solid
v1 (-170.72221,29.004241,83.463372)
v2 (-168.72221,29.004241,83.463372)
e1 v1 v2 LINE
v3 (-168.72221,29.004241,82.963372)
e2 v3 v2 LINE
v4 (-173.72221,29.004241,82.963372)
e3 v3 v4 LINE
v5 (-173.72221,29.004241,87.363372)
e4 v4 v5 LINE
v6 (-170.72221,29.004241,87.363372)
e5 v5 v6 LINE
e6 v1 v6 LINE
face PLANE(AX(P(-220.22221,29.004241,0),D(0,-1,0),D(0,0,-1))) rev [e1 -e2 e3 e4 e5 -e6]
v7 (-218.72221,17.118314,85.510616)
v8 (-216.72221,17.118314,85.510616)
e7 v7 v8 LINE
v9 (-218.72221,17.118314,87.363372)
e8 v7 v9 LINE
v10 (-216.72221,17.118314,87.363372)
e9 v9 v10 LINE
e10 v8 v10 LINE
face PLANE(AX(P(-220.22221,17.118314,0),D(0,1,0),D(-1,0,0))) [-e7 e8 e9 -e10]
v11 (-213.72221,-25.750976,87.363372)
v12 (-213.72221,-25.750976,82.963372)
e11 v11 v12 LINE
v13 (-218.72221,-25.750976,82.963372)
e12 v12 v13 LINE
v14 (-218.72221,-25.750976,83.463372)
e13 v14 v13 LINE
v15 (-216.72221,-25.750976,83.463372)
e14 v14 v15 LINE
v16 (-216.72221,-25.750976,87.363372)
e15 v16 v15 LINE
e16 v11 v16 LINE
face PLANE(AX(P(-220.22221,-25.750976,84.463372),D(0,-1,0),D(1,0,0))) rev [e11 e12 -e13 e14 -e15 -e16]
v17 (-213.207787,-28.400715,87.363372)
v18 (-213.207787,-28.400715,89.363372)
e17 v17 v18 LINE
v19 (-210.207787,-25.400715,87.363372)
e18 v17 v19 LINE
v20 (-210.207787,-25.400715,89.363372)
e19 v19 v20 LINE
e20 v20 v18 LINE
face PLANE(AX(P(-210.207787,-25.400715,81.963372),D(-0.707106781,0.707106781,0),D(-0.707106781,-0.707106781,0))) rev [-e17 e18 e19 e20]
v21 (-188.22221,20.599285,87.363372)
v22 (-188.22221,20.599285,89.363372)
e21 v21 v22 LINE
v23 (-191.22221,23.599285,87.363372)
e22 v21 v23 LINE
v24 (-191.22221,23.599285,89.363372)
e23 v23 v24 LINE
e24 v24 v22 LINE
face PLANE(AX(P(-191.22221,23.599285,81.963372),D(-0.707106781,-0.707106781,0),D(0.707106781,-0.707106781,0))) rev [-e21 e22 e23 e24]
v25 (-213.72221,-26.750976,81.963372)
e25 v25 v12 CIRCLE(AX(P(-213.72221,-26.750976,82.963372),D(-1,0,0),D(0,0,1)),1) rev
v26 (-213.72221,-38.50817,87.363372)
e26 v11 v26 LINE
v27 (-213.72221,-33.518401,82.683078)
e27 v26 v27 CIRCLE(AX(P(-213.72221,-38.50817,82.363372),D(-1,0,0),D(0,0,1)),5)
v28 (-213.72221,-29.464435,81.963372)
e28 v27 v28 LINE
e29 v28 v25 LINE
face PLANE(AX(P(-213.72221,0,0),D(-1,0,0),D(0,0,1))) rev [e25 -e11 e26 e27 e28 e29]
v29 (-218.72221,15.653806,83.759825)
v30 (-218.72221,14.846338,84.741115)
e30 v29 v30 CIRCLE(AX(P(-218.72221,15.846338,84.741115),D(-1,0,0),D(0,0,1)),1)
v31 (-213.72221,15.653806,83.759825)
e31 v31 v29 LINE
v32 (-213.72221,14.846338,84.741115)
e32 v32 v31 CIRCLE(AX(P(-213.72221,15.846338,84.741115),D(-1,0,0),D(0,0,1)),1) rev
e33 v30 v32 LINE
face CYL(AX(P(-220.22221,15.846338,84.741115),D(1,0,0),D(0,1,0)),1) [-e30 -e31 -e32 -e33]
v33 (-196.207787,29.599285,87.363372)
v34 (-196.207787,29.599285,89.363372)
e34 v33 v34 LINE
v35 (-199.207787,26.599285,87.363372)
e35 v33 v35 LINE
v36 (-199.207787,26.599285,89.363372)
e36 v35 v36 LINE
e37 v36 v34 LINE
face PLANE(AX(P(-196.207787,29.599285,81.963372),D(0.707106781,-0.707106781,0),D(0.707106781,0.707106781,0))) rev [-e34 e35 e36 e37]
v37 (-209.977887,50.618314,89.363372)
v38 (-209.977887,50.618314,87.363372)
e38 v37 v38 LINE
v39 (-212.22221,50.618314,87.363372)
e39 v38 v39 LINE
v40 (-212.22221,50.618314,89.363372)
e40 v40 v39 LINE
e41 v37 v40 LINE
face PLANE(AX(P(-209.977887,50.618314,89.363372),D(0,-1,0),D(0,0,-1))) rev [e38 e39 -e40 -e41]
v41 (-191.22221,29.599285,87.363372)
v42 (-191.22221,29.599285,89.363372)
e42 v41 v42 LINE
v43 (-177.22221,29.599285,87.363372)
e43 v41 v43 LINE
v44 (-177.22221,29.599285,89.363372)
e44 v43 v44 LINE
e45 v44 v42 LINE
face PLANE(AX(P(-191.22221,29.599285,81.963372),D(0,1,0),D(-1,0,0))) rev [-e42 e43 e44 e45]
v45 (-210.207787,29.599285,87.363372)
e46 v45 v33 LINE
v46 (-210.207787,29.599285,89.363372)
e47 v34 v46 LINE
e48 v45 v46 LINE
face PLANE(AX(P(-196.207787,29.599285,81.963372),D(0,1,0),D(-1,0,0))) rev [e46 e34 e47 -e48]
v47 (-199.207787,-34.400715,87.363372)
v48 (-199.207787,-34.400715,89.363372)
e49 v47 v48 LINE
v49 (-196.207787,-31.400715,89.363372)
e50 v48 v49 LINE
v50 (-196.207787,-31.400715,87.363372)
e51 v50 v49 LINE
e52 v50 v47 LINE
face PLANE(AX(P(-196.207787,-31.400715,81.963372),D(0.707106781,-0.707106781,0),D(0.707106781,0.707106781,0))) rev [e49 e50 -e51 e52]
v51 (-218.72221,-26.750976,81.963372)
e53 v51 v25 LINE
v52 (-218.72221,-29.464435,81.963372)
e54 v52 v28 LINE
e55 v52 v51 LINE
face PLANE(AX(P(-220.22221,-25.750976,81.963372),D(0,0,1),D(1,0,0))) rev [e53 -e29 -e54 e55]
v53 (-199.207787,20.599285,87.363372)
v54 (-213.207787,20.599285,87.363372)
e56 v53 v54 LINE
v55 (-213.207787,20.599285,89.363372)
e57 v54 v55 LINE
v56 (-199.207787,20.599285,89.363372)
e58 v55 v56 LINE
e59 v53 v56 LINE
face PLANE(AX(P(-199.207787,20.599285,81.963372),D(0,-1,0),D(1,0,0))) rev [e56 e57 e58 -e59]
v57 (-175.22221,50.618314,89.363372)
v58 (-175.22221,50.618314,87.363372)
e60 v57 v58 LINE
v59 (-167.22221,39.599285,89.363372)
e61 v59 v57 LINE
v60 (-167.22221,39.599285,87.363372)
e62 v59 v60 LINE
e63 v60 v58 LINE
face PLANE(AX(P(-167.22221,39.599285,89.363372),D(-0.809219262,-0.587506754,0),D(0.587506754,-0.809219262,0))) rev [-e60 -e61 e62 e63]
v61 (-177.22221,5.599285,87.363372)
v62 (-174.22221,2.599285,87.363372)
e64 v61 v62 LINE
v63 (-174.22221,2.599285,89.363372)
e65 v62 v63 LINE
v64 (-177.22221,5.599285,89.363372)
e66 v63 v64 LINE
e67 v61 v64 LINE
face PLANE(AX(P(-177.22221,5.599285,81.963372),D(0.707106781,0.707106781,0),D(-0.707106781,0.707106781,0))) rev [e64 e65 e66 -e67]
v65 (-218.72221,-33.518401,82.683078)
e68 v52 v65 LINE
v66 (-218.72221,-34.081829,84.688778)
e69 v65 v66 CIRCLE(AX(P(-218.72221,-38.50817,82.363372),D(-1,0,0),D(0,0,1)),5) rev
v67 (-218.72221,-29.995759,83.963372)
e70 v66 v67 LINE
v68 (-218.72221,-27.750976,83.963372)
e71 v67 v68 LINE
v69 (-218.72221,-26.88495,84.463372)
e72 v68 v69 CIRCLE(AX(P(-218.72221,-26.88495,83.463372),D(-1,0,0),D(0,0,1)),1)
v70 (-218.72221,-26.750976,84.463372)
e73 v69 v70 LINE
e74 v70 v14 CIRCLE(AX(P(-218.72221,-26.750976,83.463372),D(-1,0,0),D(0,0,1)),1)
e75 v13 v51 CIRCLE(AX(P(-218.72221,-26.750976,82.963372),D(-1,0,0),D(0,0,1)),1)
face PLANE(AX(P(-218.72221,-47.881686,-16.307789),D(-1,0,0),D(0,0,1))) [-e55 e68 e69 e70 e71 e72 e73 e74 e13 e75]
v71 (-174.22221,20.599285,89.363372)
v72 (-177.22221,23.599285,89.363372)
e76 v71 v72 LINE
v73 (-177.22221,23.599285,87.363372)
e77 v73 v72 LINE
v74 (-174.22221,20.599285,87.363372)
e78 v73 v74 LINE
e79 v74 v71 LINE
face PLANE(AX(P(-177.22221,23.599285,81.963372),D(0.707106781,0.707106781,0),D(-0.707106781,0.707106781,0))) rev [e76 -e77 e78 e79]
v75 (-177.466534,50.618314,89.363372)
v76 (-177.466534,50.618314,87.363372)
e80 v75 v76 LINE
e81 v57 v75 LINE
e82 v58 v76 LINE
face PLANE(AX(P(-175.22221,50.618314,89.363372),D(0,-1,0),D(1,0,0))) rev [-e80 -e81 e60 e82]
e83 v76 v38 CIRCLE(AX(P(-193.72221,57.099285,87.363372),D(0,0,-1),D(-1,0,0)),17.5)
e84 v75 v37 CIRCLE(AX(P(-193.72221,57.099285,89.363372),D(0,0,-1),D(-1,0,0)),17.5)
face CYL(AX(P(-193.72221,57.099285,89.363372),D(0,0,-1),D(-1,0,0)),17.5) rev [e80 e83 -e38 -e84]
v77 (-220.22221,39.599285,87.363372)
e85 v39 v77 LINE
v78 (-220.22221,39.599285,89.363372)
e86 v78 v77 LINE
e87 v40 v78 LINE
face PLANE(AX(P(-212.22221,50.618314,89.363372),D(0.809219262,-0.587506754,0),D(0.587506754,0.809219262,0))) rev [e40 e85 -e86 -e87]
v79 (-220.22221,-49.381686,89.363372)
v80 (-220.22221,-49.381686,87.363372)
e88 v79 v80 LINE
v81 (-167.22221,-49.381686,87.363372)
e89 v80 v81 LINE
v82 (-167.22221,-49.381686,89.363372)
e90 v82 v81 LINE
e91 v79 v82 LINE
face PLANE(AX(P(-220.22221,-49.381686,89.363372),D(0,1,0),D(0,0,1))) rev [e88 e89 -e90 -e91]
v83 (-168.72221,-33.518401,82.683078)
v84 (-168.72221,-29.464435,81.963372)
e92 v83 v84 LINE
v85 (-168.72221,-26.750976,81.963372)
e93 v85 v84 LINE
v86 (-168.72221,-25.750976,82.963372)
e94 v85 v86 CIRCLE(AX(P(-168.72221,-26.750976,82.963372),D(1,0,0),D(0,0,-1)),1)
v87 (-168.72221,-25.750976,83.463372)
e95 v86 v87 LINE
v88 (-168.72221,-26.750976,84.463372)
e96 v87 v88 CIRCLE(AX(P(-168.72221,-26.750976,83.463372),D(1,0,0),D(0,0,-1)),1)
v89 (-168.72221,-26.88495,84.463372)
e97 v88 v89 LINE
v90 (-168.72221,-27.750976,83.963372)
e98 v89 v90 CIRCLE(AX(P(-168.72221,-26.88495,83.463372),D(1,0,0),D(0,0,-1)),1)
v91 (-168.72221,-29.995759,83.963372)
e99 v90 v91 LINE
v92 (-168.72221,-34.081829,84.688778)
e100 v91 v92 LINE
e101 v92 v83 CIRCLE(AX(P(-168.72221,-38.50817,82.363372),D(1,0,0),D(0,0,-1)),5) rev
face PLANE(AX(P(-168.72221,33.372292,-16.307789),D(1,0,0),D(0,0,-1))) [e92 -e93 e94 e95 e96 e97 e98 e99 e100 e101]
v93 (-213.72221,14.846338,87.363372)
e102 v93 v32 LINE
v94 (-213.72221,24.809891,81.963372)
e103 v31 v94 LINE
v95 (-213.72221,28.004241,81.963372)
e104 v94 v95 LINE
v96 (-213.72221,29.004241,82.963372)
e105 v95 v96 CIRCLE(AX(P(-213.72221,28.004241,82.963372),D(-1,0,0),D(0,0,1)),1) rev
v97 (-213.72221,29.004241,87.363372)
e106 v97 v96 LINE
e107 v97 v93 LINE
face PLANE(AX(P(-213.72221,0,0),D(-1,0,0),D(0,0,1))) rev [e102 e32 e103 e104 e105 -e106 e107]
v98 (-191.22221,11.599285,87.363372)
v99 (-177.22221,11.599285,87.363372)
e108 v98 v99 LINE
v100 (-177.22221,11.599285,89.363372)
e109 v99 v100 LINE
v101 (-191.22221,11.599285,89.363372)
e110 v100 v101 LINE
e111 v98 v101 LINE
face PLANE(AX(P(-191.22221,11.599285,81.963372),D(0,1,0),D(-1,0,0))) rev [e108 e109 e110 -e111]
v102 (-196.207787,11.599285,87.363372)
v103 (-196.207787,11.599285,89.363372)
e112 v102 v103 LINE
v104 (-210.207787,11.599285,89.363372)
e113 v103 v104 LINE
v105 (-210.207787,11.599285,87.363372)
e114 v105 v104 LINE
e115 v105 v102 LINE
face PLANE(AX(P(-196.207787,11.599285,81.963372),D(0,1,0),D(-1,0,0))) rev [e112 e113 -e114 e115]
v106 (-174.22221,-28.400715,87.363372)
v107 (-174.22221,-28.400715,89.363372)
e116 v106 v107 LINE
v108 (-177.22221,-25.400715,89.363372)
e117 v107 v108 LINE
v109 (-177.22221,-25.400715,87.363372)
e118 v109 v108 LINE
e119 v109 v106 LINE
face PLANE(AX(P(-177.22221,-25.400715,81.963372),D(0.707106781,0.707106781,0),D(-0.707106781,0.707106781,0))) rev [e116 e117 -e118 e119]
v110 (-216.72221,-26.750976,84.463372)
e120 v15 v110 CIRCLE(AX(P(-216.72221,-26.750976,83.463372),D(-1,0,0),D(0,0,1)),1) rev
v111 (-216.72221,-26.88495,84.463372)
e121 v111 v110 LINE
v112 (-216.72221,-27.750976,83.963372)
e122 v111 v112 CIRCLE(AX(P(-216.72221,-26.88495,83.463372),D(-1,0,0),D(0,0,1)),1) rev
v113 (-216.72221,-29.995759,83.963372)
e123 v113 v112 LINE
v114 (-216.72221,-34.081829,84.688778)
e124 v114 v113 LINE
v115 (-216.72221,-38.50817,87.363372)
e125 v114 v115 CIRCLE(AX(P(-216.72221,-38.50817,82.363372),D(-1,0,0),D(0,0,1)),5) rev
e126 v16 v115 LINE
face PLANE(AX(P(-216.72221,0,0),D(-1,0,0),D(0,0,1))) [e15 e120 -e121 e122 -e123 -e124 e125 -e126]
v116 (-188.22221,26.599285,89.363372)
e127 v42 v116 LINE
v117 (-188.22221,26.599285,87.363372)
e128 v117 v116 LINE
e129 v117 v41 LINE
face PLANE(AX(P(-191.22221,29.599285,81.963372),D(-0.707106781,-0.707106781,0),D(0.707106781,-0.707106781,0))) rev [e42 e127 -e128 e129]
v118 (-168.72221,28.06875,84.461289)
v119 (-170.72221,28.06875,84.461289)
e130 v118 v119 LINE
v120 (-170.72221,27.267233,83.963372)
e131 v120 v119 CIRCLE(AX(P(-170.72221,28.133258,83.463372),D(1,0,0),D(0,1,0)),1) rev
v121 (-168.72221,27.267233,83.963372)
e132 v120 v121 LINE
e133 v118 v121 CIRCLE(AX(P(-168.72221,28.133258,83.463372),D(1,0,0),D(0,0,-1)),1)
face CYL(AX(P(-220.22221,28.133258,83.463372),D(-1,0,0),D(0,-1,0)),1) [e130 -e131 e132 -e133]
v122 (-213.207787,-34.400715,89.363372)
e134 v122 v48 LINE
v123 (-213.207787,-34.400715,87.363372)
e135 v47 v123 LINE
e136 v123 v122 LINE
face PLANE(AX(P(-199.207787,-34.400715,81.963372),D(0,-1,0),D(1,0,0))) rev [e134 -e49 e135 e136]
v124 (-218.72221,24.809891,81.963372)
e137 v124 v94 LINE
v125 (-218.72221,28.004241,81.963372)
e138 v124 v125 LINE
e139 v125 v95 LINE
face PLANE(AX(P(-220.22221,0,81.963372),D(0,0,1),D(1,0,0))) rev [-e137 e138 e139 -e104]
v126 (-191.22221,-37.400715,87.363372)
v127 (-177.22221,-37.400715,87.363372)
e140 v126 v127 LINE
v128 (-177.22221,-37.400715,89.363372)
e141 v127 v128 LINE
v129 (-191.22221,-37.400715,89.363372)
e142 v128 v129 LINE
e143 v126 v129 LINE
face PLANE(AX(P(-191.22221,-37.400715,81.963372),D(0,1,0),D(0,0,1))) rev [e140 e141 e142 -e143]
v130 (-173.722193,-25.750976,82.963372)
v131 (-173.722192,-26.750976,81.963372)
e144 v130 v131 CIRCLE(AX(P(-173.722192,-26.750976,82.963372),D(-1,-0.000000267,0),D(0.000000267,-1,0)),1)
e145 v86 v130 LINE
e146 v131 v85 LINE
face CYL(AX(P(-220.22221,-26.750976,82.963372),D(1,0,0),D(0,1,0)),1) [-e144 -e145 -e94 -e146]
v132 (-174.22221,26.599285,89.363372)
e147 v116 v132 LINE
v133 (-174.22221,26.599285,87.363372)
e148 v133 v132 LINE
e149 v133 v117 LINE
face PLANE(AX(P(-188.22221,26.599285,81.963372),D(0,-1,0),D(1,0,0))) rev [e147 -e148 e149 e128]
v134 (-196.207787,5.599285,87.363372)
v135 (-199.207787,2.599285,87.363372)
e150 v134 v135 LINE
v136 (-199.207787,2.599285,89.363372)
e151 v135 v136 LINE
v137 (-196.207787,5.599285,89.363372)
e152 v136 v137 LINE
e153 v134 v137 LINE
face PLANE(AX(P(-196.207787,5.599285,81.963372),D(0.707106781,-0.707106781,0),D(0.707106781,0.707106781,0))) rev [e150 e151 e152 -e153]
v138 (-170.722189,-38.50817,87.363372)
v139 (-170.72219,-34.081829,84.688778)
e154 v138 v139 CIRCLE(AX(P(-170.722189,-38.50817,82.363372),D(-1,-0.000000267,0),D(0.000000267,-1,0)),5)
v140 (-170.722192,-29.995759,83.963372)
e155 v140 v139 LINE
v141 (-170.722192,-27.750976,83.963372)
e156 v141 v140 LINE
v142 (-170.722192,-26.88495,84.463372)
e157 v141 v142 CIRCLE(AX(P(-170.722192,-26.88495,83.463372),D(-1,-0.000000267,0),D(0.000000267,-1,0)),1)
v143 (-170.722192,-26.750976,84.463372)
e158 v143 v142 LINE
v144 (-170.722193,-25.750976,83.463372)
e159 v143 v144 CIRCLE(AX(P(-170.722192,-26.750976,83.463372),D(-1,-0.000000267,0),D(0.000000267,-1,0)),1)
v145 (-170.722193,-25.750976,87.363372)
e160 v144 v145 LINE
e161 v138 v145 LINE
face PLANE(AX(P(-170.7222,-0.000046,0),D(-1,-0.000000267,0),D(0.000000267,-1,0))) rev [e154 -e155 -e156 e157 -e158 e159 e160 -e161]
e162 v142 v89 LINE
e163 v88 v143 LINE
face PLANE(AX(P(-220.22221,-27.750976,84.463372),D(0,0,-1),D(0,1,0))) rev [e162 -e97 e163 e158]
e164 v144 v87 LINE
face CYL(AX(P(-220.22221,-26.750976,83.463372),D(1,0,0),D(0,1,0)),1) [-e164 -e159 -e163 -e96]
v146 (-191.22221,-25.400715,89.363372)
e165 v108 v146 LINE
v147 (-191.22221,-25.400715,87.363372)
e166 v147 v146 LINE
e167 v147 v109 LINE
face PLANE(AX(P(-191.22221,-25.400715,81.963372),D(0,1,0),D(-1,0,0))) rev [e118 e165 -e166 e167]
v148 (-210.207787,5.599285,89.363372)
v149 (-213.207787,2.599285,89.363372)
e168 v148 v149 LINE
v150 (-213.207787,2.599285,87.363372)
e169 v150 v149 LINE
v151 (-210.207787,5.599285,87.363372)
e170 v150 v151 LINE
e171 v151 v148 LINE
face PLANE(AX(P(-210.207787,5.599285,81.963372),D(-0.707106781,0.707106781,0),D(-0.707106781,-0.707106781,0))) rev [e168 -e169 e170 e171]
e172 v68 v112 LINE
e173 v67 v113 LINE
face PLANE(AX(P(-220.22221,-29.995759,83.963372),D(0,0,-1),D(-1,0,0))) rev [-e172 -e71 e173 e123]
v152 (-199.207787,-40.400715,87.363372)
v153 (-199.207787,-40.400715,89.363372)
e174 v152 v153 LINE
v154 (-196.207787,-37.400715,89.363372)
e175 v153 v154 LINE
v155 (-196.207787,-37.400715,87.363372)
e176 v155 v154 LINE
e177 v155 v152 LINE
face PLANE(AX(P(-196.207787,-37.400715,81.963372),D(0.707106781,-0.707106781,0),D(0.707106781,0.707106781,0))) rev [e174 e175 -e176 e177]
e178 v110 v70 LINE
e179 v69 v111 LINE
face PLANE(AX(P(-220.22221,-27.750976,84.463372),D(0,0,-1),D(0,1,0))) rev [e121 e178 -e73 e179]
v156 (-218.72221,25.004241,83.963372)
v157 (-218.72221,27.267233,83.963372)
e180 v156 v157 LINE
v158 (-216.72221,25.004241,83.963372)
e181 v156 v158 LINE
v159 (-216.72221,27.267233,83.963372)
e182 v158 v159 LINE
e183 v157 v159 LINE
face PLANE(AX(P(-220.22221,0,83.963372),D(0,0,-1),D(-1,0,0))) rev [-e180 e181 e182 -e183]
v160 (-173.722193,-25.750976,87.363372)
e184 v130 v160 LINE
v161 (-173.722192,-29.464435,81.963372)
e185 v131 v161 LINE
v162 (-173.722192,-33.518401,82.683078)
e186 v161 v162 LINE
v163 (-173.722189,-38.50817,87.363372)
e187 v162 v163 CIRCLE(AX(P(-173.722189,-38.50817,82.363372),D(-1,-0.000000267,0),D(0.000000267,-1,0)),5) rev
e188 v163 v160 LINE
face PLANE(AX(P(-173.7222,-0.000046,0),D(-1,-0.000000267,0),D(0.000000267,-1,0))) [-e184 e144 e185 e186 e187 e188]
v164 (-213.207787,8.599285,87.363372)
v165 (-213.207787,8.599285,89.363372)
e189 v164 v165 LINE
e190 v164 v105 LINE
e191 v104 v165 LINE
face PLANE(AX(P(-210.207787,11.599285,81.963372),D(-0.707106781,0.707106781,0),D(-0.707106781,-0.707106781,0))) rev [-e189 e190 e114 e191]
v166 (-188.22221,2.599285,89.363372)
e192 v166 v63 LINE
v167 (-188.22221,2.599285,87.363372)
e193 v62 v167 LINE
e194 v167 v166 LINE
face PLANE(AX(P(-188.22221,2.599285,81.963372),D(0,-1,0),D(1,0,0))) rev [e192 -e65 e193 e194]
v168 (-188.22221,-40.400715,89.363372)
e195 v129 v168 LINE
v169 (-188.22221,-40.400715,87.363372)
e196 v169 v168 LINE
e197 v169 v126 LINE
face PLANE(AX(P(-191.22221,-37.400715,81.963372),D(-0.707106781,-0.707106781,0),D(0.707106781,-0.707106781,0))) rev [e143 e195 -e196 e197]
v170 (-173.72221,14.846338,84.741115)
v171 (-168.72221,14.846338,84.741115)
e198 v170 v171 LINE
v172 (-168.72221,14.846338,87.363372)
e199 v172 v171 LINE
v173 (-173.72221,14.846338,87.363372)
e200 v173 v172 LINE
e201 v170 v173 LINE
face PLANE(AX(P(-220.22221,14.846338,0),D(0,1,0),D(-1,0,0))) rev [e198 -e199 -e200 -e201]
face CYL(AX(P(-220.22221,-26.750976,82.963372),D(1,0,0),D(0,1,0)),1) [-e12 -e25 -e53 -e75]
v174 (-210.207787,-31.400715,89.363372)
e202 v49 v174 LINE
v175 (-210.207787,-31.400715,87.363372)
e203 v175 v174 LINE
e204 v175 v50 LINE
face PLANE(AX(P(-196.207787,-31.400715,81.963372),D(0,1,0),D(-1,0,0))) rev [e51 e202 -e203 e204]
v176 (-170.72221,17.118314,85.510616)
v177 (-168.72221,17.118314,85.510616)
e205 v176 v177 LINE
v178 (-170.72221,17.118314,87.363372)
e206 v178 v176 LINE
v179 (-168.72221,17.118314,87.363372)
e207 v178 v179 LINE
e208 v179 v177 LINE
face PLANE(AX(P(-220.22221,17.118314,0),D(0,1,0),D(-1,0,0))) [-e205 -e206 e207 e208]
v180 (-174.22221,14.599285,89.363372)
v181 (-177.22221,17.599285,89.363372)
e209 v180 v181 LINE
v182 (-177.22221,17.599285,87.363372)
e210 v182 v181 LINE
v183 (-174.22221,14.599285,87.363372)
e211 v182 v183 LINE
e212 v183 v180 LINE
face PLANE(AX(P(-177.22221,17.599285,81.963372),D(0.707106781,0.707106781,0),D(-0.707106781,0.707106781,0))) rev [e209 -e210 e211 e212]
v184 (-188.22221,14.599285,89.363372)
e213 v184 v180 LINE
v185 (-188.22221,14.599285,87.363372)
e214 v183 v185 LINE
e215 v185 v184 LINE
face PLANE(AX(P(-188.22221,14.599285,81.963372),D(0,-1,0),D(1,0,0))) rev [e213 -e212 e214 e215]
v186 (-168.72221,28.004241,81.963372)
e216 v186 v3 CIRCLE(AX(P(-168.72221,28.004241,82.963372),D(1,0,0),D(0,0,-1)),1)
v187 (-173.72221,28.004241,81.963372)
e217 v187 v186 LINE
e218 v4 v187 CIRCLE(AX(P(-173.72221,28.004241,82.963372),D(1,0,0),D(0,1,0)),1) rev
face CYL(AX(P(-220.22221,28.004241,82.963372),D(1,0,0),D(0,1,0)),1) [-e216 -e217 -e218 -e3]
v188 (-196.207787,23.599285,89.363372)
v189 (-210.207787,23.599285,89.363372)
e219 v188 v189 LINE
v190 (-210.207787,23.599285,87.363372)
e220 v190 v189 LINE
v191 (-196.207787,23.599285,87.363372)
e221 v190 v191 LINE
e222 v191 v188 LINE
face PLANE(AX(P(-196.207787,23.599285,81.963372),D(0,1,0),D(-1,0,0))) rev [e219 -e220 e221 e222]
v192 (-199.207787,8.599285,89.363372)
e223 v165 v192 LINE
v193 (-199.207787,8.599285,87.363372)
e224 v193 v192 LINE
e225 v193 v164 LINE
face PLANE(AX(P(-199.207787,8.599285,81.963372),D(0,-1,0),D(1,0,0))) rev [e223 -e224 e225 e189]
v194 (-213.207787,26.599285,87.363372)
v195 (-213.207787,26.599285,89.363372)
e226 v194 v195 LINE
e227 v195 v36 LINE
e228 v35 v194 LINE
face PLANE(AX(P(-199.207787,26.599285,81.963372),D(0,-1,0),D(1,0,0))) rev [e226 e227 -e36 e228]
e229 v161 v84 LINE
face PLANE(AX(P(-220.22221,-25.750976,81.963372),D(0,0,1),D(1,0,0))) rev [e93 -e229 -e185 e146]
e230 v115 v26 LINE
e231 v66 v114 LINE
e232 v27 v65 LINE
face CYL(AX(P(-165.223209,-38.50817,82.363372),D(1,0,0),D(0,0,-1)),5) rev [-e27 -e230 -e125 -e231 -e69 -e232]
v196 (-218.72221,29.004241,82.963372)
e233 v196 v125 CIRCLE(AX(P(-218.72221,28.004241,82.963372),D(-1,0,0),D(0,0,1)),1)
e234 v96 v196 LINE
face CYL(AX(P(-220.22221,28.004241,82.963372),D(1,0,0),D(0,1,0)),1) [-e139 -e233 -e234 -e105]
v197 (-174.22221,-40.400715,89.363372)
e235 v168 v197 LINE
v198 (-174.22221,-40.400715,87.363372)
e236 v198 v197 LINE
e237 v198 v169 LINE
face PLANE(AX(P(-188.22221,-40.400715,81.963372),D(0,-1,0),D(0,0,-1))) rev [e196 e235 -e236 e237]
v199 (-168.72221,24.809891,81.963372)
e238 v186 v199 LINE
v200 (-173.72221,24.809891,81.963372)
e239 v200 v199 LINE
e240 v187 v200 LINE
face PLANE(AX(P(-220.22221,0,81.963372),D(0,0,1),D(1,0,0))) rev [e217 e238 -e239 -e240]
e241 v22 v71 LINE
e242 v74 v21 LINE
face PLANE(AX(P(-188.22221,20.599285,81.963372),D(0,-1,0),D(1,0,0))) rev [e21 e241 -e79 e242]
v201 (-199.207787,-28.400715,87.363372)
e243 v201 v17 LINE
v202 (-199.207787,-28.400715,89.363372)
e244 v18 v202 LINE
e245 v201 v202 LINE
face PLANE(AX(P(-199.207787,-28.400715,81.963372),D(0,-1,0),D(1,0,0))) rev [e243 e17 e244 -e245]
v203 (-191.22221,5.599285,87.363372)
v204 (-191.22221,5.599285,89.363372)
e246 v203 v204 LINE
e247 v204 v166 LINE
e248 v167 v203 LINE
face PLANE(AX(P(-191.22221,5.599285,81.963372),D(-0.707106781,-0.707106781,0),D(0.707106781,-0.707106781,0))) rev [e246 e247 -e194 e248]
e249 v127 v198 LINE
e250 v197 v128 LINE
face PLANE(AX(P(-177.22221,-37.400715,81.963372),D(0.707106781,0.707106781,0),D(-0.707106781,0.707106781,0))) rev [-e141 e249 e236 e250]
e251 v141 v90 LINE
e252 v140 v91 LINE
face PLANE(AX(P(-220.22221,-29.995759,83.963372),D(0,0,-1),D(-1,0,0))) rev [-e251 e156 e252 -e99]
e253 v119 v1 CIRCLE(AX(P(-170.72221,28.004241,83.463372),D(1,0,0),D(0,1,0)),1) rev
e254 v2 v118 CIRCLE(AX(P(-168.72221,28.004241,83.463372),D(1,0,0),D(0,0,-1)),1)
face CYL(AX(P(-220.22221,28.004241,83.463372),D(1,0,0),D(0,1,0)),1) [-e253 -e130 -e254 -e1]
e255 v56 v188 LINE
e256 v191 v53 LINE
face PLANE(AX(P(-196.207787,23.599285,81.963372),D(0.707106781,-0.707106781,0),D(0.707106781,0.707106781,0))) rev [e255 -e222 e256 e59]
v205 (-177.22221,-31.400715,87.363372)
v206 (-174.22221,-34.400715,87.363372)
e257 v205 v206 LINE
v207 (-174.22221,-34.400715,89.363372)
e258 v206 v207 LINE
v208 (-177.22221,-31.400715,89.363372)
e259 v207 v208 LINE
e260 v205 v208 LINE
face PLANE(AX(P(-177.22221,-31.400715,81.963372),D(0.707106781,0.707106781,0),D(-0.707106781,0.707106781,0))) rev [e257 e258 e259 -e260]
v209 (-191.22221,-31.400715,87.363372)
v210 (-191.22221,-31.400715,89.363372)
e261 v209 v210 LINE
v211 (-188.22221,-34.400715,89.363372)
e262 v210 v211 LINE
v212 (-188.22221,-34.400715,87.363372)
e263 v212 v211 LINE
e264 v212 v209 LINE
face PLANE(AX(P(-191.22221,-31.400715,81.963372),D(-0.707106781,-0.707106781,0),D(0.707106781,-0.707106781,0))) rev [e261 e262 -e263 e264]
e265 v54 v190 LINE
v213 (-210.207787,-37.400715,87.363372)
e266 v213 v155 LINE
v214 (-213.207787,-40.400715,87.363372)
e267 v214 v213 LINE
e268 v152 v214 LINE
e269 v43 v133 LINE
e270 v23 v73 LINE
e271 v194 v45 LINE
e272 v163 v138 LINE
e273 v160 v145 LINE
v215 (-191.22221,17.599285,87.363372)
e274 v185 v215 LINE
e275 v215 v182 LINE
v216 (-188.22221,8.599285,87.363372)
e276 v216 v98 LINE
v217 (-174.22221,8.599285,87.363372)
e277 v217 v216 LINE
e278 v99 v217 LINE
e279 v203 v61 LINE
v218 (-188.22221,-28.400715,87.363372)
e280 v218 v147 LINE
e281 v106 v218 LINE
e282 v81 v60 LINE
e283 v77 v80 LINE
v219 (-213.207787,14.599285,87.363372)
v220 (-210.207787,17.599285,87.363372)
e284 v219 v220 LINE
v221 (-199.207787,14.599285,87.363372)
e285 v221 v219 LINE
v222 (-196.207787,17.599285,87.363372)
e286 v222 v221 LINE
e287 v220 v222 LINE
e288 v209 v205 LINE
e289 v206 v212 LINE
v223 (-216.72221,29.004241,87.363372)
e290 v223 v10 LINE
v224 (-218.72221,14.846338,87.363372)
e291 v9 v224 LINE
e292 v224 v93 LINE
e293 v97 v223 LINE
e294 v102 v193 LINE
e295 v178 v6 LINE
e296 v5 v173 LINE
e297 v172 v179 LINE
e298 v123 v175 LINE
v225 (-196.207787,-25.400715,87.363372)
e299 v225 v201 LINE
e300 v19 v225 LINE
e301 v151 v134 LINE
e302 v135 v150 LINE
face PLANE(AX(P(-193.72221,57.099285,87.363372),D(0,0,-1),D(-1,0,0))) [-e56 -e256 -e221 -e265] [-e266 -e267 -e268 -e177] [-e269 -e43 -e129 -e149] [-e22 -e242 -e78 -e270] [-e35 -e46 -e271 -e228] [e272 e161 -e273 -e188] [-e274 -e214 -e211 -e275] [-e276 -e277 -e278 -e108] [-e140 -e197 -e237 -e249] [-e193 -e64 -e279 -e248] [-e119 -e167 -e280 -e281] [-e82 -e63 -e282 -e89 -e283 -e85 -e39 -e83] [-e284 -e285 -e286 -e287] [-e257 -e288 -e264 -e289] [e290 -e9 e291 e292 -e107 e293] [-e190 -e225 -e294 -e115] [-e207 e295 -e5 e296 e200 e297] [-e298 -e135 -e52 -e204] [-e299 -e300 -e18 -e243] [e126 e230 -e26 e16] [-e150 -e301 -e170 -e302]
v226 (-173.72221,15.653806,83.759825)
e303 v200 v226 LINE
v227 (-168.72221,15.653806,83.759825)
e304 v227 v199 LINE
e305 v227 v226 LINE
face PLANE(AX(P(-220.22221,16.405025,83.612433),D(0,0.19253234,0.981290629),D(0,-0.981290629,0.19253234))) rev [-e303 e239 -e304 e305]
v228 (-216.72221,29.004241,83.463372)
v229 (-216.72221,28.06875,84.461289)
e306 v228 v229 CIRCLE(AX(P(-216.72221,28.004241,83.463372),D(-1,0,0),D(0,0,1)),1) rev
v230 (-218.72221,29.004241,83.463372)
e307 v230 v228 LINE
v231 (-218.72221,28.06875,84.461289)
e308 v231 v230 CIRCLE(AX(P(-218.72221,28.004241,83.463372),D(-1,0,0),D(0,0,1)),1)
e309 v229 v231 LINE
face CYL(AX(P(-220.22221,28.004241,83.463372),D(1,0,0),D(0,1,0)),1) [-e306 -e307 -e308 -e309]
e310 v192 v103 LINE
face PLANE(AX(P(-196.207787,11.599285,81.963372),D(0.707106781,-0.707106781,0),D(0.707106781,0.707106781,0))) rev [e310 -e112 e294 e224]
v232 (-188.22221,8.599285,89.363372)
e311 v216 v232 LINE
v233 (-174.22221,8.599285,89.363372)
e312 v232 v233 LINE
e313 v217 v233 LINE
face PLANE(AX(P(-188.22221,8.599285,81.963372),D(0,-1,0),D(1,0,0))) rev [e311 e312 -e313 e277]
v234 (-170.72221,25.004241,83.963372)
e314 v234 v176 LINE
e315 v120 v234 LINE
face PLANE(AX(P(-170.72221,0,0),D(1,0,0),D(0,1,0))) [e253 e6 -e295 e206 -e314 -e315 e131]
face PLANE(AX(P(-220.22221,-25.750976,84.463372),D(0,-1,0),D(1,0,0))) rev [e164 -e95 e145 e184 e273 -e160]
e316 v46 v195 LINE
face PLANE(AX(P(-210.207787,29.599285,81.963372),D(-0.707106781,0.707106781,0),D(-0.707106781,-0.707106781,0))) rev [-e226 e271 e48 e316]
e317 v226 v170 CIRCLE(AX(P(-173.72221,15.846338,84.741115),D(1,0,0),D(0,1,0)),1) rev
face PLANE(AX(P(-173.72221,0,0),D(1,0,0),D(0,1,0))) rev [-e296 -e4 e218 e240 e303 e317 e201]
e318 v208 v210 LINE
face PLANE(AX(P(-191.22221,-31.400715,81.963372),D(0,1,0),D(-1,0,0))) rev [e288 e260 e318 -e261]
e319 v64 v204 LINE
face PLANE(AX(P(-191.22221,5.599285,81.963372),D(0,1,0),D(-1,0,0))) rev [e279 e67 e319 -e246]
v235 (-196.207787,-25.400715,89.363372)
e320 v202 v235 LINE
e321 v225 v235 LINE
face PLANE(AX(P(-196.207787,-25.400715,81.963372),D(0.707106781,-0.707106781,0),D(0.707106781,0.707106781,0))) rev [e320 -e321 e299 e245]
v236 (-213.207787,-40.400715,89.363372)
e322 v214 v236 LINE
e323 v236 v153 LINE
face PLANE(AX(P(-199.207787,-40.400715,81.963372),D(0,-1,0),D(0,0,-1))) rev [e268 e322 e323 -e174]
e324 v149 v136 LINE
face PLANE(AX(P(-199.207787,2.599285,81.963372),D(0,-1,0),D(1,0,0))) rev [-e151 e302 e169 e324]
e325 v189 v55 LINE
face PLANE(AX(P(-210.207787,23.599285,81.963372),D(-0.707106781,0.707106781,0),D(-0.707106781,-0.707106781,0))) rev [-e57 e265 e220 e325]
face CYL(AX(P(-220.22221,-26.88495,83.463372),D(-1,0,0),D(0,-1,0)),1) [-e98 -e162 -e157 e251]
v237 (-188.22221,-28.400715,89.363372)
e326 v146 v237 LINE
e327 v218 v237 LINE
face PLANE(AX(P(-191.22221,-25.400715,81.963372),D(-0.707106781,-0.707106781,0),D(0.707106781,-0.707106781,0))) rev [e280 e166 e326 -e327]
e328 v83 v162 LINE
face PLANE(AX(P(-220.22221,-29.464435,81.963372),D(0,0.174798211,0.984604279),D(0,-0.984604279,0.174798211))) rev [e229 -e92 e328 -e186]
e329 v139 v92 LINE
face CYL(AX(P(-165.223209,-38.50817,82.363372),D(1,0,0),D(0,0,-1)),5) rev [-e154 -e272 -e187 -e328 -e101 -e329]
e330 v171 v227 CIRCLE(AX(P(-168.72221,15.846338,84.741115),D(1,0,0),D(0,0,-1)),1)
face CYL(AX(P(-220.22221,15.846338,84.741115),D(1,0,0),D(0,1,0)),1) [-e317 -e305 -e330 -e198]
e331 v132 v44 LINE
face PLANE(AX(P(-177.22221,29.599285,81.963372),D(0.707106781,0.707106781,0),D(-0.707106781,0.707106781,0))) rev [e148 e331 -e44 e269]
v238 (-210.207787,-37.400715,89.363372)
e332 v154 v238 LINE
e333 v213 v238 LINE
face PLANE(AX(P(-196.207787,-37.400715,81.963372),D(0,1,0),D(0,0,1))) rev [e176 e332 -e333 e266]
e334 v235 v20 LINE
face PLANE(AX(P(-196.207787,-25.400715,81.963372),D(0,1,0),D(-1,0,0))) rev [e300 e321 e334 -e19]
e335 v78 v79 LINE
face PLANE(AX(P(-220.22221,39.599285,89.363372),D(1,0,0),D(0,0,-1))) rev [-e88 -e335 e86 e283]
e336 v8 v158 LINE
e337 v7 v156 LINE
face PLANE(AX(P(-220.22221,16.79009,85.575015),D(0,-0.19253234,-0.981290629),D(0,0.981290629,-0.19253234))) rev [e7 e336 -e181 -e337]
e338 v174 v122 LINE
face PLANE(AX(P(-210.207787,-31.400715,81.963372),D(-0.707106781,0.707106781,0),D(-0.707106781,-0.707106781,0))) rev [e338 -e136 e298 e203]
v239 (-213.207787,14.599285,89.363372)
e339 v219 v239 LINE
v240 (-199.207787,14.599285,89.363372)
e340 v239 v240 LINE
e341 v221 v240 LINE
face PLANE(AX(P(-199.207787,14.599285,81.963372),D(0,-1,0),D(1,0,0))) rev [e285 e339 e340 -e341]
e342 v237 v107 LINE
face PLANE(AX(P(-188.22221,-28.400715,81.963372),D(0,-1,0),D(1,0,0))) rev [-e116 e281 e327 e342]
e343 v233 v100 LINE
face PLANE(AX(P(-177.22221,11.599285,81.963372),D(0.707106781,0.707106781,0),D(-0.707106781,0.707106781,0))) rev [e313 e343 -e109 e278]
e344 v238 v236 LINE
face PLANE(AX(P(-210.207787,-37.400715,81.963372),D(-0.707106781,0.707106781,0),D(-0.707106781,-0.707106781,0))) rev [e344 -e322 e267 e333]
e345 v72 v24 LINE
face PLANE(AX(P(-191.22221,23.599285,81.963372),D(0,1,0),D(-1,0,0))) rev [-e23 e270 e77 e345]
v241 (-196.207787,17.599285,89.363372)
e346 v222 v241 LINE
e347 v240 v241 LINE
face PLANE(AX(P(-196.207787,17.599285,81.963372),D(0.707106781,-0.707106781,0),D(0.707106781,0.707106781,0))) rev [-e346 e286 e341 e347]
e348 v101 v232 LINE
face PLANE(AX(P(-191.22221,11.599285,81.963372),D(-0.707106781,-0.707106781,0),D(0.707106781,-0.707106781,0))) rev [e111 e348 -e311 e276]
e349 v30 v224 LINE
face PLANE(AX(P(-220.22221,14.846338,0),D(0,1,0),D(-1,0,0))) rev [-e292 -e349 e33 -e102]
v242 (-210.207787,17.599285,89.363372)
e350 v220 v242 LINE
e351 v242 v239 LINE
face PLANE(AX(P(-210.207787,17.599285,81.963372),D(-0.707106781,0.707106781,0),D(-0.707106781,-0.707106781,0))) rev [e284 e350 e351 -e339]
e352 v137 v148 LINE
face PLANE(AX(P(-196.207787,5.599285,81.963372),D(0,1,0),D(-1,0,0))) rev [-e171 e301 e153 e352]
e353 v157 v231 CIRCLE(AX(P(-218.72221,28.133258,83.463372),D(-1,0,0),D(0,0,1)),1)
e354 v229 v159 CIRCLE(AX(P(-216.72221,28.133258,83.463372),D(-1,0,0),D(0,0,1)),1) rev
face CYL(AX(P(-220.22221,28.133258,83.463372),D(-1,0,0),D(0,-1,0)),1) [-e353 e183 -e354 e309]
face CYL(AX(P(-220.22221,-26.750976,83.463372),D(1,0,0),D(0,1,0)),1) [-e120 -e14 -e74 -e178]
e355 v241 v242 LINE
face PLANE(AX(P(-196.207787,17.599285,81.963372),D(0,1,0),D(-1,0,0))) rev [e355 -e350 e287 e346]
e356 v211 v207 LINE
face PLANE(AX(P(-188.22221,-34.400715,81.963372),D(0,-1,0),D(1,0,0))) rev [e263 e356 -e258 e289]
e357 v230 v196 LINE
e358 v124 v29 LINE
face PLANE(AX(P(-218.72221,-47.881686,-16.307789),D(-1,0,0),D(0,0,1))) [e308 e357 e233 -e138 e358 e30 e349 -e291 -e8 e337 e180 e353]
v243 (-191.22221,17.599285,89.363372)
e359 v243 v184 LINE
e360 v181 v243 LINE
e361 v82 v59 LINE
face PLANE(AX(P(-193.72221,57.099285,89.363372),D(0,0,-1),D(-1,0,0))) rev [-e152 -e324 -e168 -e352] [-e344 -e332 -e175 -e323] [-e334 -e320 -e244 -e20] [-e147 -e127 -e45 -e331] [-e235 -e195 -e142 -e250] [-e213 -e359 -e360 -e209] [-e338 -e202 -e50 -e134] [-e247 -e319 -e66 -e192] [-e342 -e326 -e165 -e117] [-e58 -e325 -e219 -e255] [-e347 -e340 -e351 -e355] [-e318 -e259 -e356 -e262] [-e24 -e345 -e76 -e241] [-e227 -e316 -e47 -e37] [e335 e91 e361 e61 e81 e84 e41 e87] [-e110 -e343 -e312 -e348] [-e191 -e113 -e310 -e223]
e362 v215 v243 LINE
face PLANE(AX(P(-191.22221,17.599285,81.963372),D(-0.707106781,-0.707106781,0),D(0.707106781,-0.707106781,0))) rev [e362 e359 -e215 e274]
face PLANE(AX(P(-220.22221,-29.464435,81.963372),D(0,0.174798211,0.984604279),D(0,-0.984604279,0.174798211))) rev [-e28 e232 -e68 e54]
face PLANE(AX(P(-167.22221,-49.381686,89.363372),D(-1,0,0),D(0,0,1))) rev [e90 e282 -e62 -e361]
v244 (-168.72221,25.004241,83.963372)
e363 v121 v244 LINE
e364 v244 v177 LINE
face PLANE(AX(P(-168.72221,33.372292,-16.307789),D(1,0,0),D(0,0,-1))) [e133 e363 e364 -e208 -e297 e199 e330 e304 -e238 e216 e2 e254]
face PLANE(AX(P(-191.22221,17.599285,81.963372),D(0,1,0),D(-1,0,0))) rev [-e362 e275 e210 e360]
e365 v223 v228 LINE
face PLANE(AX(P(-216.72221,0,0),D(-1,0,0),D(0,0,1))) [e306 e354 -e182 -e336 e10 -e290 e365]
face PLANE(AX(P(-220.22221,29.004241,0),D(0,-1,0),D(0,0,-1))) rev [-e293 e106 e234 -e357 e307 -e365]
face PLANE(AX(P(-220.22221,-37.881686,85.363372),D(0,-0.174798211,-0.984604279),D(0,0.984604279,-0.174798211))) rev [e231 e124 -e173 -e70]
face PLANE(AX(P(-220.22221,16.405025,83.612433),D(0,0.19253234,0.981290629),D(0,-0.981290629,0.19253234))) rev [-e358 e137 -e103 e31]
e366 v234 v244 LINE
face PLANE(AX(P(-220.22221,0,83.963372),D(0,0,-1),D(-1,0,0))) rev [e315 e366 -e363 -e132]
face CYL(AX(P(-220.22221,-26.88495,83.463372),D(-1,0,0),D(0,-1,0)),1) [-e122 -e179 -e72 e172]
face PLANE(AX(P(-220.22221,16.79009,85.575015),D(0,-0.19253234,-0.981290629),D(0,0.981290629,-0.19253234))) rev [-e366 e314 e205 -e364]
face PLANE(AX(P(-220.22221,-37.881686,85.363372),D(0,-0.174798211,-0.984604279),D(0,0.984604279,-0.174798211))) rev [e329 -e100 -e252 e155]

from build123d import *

# Parameters (mm, degrees)
BOSS_EXTRU_1_DEPTH      = 2
BOSS_EXTRU_3_START      = -53
BOSS_EXTRU_3_DEPTH      = 53.000012
ENL_V_MAT_EXTRU_1_REACH = 228.086
BOSS_EXTRU_4_START      = -3.5
BOSS_EXTRU_4_DEPTH      = 3
BOSS_EXTRU_5_START      = -49.5
BOSS_EXTRU_5_DEPTH      = 3
BOSS_EXTRU_6_START      = -6.499983
BOSS_EXTRU_6_DEPTH      = 3.000004
BOSS_EXTRU_7_START      = -49.5
BOSS_EXTRU_7_DEPTH      = 3
ENL_V_MAT_EXTRU_4_REACH = 228.029
CONG_1_START            = -218.722210076
CONG_1_DEPTH            = 2
CONG_1_START_2          = -170.722192301
CONG_1_2_DEPTH          = 1.999982225
CONG_1_START_3          = -170.722210076
CONG_1_3_DEPTH          = 0.188775796
CONG_3_R                = 1
ENL_V_MAT_EXTRU_3_DEPTH = 227.085814543
ENL_V_START             = -5.4
ESQUISSE8_W             = 57.405681666
ESQUISSE8_H             = 8.808279197
ENL_V_MAT_EXTRU_6_DEPTH = 5.4
CONG_5_R                = 5


with BuildPart() as part:
    # Esquisse1 → Boss.-Extru.1 (new body)
    with BuildSketch(Plane.XY.offset(87.363371848)):
        with BuildLine():
            Line((-209.977886558, 50.618314147), (-212.222210076, 50.618314147))
            Line((-212.222210076, 50.618314147), (-220.222210076, 39.599284914))
            Line((-220.222210076, 39.599284914), (-220.222210076, -49.381685853))
            Line((-220.222210076, -49.381685853), (-167.222210076, -49.381685853))
            Line((-167.222210076, -49.381685853), (-167.222210076, 39.599284914))
            Line((-167.222210076, 39.599284914), (-175.222210076, 50.618314147))
            Line((-175.222210076, 50.618314147), (-177.466533593, 50.618314147))
            ThreePointArc((-177.466533593, 50.618314147), (-193.722210076, 39.599284914), (-209.977886558, 50.618314147))
        make_face()
    extrude(amount=BOSS_EXTRU_1_DEPTH)

    # Esquisse2 → Boss.-Extru.3 (add)
    with BuildSketch(Plane(origin=(-167.222210076, 0, 0), x_dir=(0, 0, -1), z_dir=(1, 0, 0)).offset(BOSS_EXTRU_3_START)):
        Polygon((-83.963371848, 25.004241463), (-85.510615846, 17.118314147), (-87.363371848, 17.118314147), (-87.363371848, 14.846338453), (-83.918252525, 14.846338453), (-81.963371848, 24.809891037), (-81.963371848, 29.004241463), (-84.463371848, 29.004241463), (-84.463371848, 27.267232592), (-83.963371848, 27.267232592), align=None)
        Polygon((-87.363371848, -39.881685853), (-87.363371848, -37.881685853), (-85.363371848, -37.881685853), (-83.963371848, -29.995758537), (-83.963371848, -27.750975606), (-84.463371848, -27.750975606), (-84.463371848, -25.750975606), (-81.963371848, -25.750975606), (-81.963371848, -29.464435342), (-83.81276129, -39.881685853), align=None)
    extrude(amount=BOSS_EXTRU_3_DEPTH)

    # Enlèv. mat.-Extru.1: up to this face of the body (flat: up to its plane)
    enl_v_mat_extru_1_end = Plane(part.part.faces().sort_by_distance((-193.722210076, 30.844149197, 87.363371848))[0])
    # Esquisse4 → Enlèv. mat.-Extru.1 (cut, up to the picked face)
    with BuildSketch(Plane(origin=(0, 0, 81.963371848), x_dir=(-1, 0, 0), z_dir=(0, 0, -1)), mode=Mode.PRIVATE) as enl_v_mat_extru_1_sk1:
        Polygon((170.722207248, 29.004241463), (216.722210076, 29.004241463), (216.722210076, -45.719527558), (170.722187305, -45.719527558), align=None)
    enl_v_mat_extru_1_tool1 = split(extrude(enl_v_mat_extru_1_sk1.sketch, amount=-ENL_V_MAT_EXTRU_1_REACH, mode=Mode.PRIVATE), bisect_by=enl_v_mat_extru_1_end, keep=Keep.BOTH, mode=Mode.PRIVATE)
    add(enl_v_mat_extru_1_tool1.solids().sort_by(Axis((-193.722204, -8.357646, 81.963372), (0, 0, 1)))[0], mode=Mode.SUBTRACT)


with BuildPart() as boss_extru_4_tool:
    # Esquisse2<4> → Boss.-Extru.4 (new body)
    with BuildSketch(Plane(origin=(-167.222210076, 0, 0), x_dir=(0, 0, -1), z_dir=(1, 0, 0)).offset(BOSS_EXTRU_4_START)):
        Polygon((-81.963371848, 29.004241463), (-88.413322327, 29.004241463), (-88.741836901, 17.118314147), (-88.741836901, 14.846338453), (-83.918252525, 14.846338453), (-81.963371848, 24.809891037), align=None)
    extrude(amount=-BOSS_EXTRU_4_DEPTH)


with BuildPart() as part_1:
    add(part.part)


with BuildPart() as part_2:
    # Boss.-Extru.4: joined with boss_extru_4_tool
    add(part_1.part.fuse(boss_extru_4_tool.part, tol=0.00001))

    # Esquisse2<5> → Boss.-Extru.5 (add)
    with BuildSketch(Plane(origin=(-167.222210076, 0, 0), x_dir=(0, 0, -1), z_dir=(1, 0, 0)).offset(BOSS_EXTRU_5_START)):
        Polygon((-87.363371848, 17.118314147), (-85.510615846, 17.118314147), (-83.963371848, 25.004241463), (-83.963371848, 27.267232592), (-84.463371848, 27.267232592), (-84.463371848, 29.004241463), (-87.363371848, 29.004241463), align=None)
        Polygon((-83.963371848, 25.004241463), (-85.510615846, 17.118314147), (-87.363371848, 17.118314147), (-87.363371848, 14.846338453), (-83.918252525, 14.846338453), (-81.963371848, 24.809891037), (-81.963371848, 29.004241463), (-84.463371848, 29.004241463), (-84.463371848, 27.267232592), (-83.963371848, 27.267232592), align=None)
    extrude(amount=BOSS_EXTRU_5_DEPTH)

    # Esquisse2<6> → Boss.-Extru.6 (add)
    with BuildSketch(Plane(origin=(-167.222210076, 0, 0), x_dir=(0, 0, -1), z_dir=(1, 0, 0)).offset(BOSS_EXTRU_6_START)):
        Polygon((-83.963371848, 25.004241463), (-85.510615846, 17.118314147), (-87.363371848, 17.118314147), (-88.741836901, 17.118314147), (-88.741836901, 14.846338453), (-83.918252525, 14.846338453), (-81.963371848, 24.809891037), (-81.963371848, 29.004241463), (-84.463371848, 29.004241463), (-84.463371848, 27.267232592), (-83.963371848, 27.267232592), align=None)
        Polygon((-87.363371848, 17.118314147), (-85.510615846, 17.118314147), (-83.963371848, 25.004241463), (-83.963371848, 27.267232592), (-84.463371848, 27.267232592), (-84.463371848, 29.004241463), (-88.413322327, 29.004241463), (-88.741836901, 17.118314147), align=None)
        Polygon((-83.963371848, -29.995758537), (-83.963371848, -27.750975606), (-84.463371848, -27.750975606), (-84.463371848, -25.750975606), (-87.363371848, -25.750975606), (-87.363371848, -37.881685853), (-85.363371848, -37.881685853), align=None)
        Polygon((-84.463371848, -27.750975606), (-83.963371848, -27.750975606), (-83.963371848, -29.995758537), (-85.363371848, -37.881685853), (-87.363371848, -37.881685853), (-87.363371848, -39.881685853), (-83.81276129, -39.881685853), (-81.963371848, -29.464435342), (-81.963371848, -25.750975606), (-84.463371848, -25.750975606), align=None)
    extrude(amount=BOSS_EXTRU_6_DEPTH)

    # Esquisse2<9> → Boss.-Extru.7 (add)
    with BuildSketch(Plane(origin=(-167.222210076, 0, 0), x_dir=(0, 0, -1), z_dir=(1, 0, 0)).offset(BOSS_EXTRU_7_START)):
        Polygon((-84.463371848, -25.750975606), (-87.363371848, -25.750975606), (-87.363371848, -37.881685853), (-85.363371848, -37.881685853), (-83.963371848, -29.995758537), (-83.963371848, -27.750975606), (-84.463371848, -27.750975606), align=None)
        Polygon((-81.963371848, -25.750975606), (-84.463371848, -25.750975606), (-84.463371848, -27.750975606), (-83.963371848, -27.750975606), (-83.963371848, -29.995758537), (-85.363371848, -37.881685853), (-87.363371848, -37.881685853), (-87.363371848, -39.881685853), (-83.81276129, -39.881685853), (-81.963371848, -29.464435342), align=None)
    extrude(amount=BOSS_EXTRU_7_DEPTH)

    # Enlèv. mat.-Extru.4: up to this face of the body (flat: up to its plane)
    enl_v_mat_extru_4_end = Plane(part_2.part.faces().sort_by_distance((-170.472204076, 26.90706625, 81.963371848))[0])
    # Esquisse7 → Enlèv. mat.-Extru.4 (cut, up to the picked face)
    with BuildSketch(Plane(origin=(0, 0, 87.363371848), x_dir=(-1, 0, 0), z_dir=(0, 0, -1)), mode=Mode.PRIVATE) as enl_v_mat_extru_4_sk1:
        Polygon((168.722210076, 33.372292481), (168.722210076, -47.881685853), (218.722210076, -47.881685853), (218.722210076, 33.372292481), (220.222210076, 33.372292481), (220.222210076, -49.381685853), (167.222210076, -49.381685853), (167.222208414, 33.372292481), align=None)
    enl_v_mat_extru_4_tool1 = split(extrude(enl_v_mat_extru_4_sk1.sketch, amount=ENL_V_MAT_EXTRU_4_REACH, mode=Mode.PRIVATE), bisect_by=enl_v_mat_extru_4_end, keep=Keep.BOTH, mode=Mode.PRIVATE)
    add(enl_v_mat_extru_4_tool1.solids().sort_by(Axis((-167.739498, -7.254697, 87.363372), (0, 0, -1)))[0], mode=Mode.SUBTRACT)


with BuildPart() as enl_v_mat_extru_4_kept_piece:
    # of the separate pieces the step leaves, the one the design keeps (enl_v_mat_extru_4_pieces_kept)
    add(part_2.part.solids().sort_by_distance((-209.977886558, 50.618314147, 87.363371848))[0])

    # Congé1: read off the stored shape, not the designer's step
    # Congé1 outline → Congé1 (cut)
    with BuildSketch(Plane.YZ.offset(CONG_1_START)):
        with BuildLine():
            Line((-27.750975606, 84.463371848), (-27.750975606, 83.963371848))
            ThreePointArc((-27.750975606, 83.963371848), (-27.384950202, 84.329397252), (-26.884950202, 84.463371848))
            Line((-26.884950202, 84.463371848), (-27.750975606, 84.463371848))
        make_face()
        with BuildLine():
            Line((-25.750975606, 84.463371848), (-26.750975606, 84.463371848))
            ThreePointArc((-26.750975606, 84.463371848), (-26.043868825, 84.170478629), (-25.750975606, 83.463371848))
            Line((-25.750975606, 83.463371848), (-25.750975606, 84.463371848))
        make_face()
        with BuildLine():
            ThreePointArc((28.06874973, 84.461289021), (28.733798955, 84.147291337), (29.004241463, 83.463371848))
            Line((29.004241463, 83.463371848), (29.004241463, 84.463371848))
            Line((29.004241463, 84.463371848), (27.267232592, 84.463371848))
            Line((27.267232592, 84.463371848), (27.267232592, 83.963371848))
            ThreePointArc((27.267232592, 83.963371848), (27.605570962, 84.312810718), (28.06874973, 84.461289021))
        make_face()
    extrude(amount=CONG_1_DEPTH, mode=Mode.SUBTRACT)

    # Cong_1 2 outline → Cong_1 2 (cut)
    with BuildSketch(Plane.YZ.offset(CONG_1_START_2)):
        with BuildLine():
            Line((-27.750975606, 84.463371848), (-27.750975606, 83.963371848))
            ThreePointArc((-27.750975606, 83.963371848), (-27.384950202, 84.329397252), (-26.884950202, 84.463371848))
            Line((-26.884950202, 84.463371848), (-27.750975606, 84.463371848))
        make_face()
        with BuildLine():
            Line((-25.750975606, 84.463371848), (-26.750975606, 84.463371848))
            ThreePointArc((-26.750975606, 84.463371848), (-26.043868825, 84.170478629), (-25.750975606, 83.463371848))
            Line((-25.750975606, 83.463371848), (-25.750975606, 84.463371848))
        make_face()
        with BuildLine():
            ThreePointArc((28.06874973, 84.461289021), (28.733798955, 84.147291337), (29.004241463, 83.463371848))
            Line((29.004241463, 83.463371848), (29.004241463, 84.463371848))
            Line((29.004241463, 84.463371848), (27.267232592, 84.463371848))
            Line((27.267232592, 84.463371848), (27.267232592, 83.963371848))
            ThreePointArc((27.267232592, 83.963371848), (27.605570962, 84.312810718), (28.06874973, 84.461289021))
        make_face()
    extrude(amount=CONG_1_2_DEPTH, mode=Mode.SUBTRACT)

    # Cong_1 3 outline → Cong_1 3 (cut)
    with BuildSketch(Plane.YZ.offset(CONG_1_START_3)):
        with BuildLine():
            ThreePointArc((28.06874973, 84.461289021), (28.733798955, 84.147291337), (29.004241463, 83.463371848))
            Line((29.004241463, 83.463371848), (29.004241463, 84.463371848))
            Line((29.004241463, 84.463371848), (27.267232592, 84.463371848))
            Line((27.267232592, 84.463371848), (27.267232592, 83.963371848))
            ThreePointArc((27.267232592, 83.963371848), (27.605570962, 84.312810718), (28.06874973, 84.461289021))
        make_face()
    extrude(amount=CONG_1_3_DEPTH, mode=Mode.SUBTRACT)

    # Congé3
    cong_3_edges = [enl_v_mat_extru_4_kept_piece.edges().sort_by_distance(p)[0] for p in [
        (-171.222210076, 29.004241463, 81.963371848),
        (-171.222210076, 14.846338453, 83.918252525),
        (-171.222201576, -39.881685853, 83.81276129),
        (-171.222201576, -25.750975606, 81.963371848),
        (-216.222210076, 29.004241463, 81.963371848),
        (-216.222210076, 14.846338453, 83.918252525),
        (-216.222210076, -39.881685853, 83.81276129),
        (-216.222210076, -25.750975606, 81.963371848),
    ]]
    fillet(cong_3_edges, radius=CONG_3_R)

    # Esquisse6 → Enlèv. mat.-Extru.3 (cut, through all)
    with BuildSketch(Plane.XY.offset(89.363371848)):
        Polygon((-191.222210076, 29.599284914), (-177.222210076, 29.599284914), (-174.222210076, 26.599284914), (-188.222210076, 26.599284914), align=None)
        Polygon((-191.222210076, -31.400715086), (-177.222210076, -31.400715086), (-174.222210076, -34.400715086), (-188.222210076, -34.400715086), align=None)
        Polygon((-191.222210076, 23.599284914), (-177.222210076, 23.599284914), (-174.222210076, 20.599284914), (-188.222210076, 20.599284914), align=None)
        Polygon((-191.222210076, 17.599284914), (-177.222210076, 17.599284914), (-174.222210076, 14.599284914), (-188.222210076, 14.599284914), align=None)
        Polygon((-191.222210076, 11.599284914), (-177.222210076, 11.599284914), (-174.222210076, 8.599284914), (-188.222210076, 8.599284914), align=None)
        Polygon((-191.222210076, 5.599284914), (-177.222210076, 5.599284914), (-174.222210076, 2.599284914), (-188.222210076, 2.599284914), align=None)
        Polygon((-191.222210076, -25.400715086), (-177.222210076, -25.400715086), (-174.222210076, -28.400715086), (-188.222210076, -28.400715086), align=None)
        Polygon((-191.222210076, -37.400715086), (-177.222210076, -37.400715086), (-174.222210076, -40.400715086), (-188.222210076, -40.400715086), align=None)
        Polygon((-210.207786747, 29.599284914), (-213.207786747, 26.599284914), (-199.207786747, 26.599284914), (-196.207786747, 29.599284914), align=None)
        Polygon((-196.207786747, -37.400715086), (-199.207786747, -40.400715086), (-213.207786747, -40.400715086), (-210.207786747, -37.400715086), align=None)
        Polygon((-196.207786747, -31.400715086), (-199.207786747, -34.400715086), (-213.207786747, -34.400715086), (-210.207786747, -31.400715086), align=None)
        Polygon((-196.207786747, 5.599284914), (-199.207786747, 2.599284914), (-213.207786747, 2.599284914), (-210.207786747, 5.599284914), align=None)
        Polygon((-196.207786747, 11.599284914), (-199.207786747, 8.599284914), (-213.207786747, 8.599284914), (-210.207786747, 11.599284914), align=None)
        Polygon((-196.207786747, 17.599284914), (-199.207786747, 14.599284914), (-213.207786747, 14.599284914), (-210.207786747, 17.599284914), align=None)
        Polygon((-196.207786747, 23.599284914), (-199.207786747, 20.599284914), (-213.207786747, 20.599284914), (-210.207786747, 23.599284914), align=None)
        Polygon((-196.207786747, -25.400715086), (-199.207786747, -28.400715086), (-213.207786747, -28.400715086), (-210.207786747, -25.400715086), align=None)
    extrude(amount=-ENL_V_MAT_EXTRU_3_DEPTH, mode=Mode.SUBTRACT)

    # Esquisse8 → Enlèv. mat.-Extru.6 (cut)
    with BuildSketch(Plane(origin=(0, 0, 81.963371848), x_dir=(-1, 0, 0), z_dir=(0, 0, -1)).offset(ENL_V_START)):
        with Locations((193.926049586, -37.922540866)):
            Rectangle(ESQUISSE8_W, ESQUISSE8_H)
    extrude(amount=ENL_V_MAT_EXTRU_6_DEPTH, mode=Mode.SUBTRACT)

    # Congé5
    # the kernel refuses this fillet: 5 mm, written as the material it adds along each edge
    with BuildSketch(Plane(origin=(-170.722189076, -33.518401267, 87.363371848), x_dir=(0, -1, 0), z_dir=(-1, 0, 0))) as cong_5_piece_1:
        with BuildLine():
            CenterArc((4.989768314, -5), CONG_5_R, 90, 86.333933602)
            Line((0, -4.680293608), (0, 0))
            Line((0, 0), (4.989768314, 0))
        make_face()
    extrude(amount=3.000004)
    with BuildSketch(Plane(origin=(-158.247768292, -33.518401267, 87.363371848), x_dir=(0, -1, 0), z_dir=(-1, 0, 0))) as cong_5_piece_2_section:
        with BuildLine():
            CenterArc((4.989768314, -5), CONG_5_R, 90, 86.333933602)
            Line((0, -4.680293608), (0, 0))
            Line((0, 0), (4.989768314, 0))
        make_face()
    cong_5_piece_2 = extrude(amount=27.948845568, mode=Mode.PRIVATE)
    cong_5_piece_2 = split(cong_5_piece_2, bisect_by=Plane(origin=(-158.247768292, -33.995933007, 84.673528566), z_dir=(0, -0.17479821137928658, -0.9846042785295026)), keep=Keep.TOP, mode=Mode.PRIVATE)
    cong_5_piece_2 = split(cong_5_piece_2, bisect_by=Plane(origin=(-168.722210076, -33.518401267, 87.363371848), z_dir=(-1, 0, 0)), keep=Keep.TOP, mode=Mode.PRIVATE)
    cong_5_piece_2 = split(cong_5_piece_2, bisect_by=Plane(origin=(-170.722189076, -33.518401267, 87.363371848), z_dir=(1, 0, 0)), keep=Keep.TOP, mode=Mode.PRIVATE)
    add(cong_5_piece_2)
    with BuildSketch(Plane(origin=(-213.722210076, -33.518401267, 87.363371848), x_dir=(0, -1, 0), z_dir=(-1, 0, 0))) as cong_5_piece_3:
        with BuildLine():
            CenterArc((4.989768314, -5), CONG_5_R, 90, 86.333933602)
            Line((0, -4.680293608), (0, 0))
            Line((0, 0), (4.989768314, 0))
        make_face()
    extrude(amount=3)
    with BuildSketch(Plane(origin=(-213.722210076, -33.518401267, 87.363371848), x_dir=(0, -1, 0), z_dir=(-1, 0, 0))) as cong_5_piece_4_section:
        with BuildLine():
            CenterArc((4.989768314, -5), CONG_5_R, 90, 86.333933602)
            Line((0, -4.680293608), (0, 0))
            Line((0, 0), (4.989768314, 0))
        make_face()
    cong_5_piece_4 = extrude(amount=15.474420784, mode=Mode.PRIVATE)
    cong_5_piece_4 = split(cong_5_piece_4, bisect_by=Plane(origin=(-213.722210076, -33.995933007, 84.673528566), z_dir=(0, -0.17479821137928658, -0.9846042785295026)), keep=Keep.TOP, mode=Mode.PRIVATE)
    cong_5_piece_4 = split(cong_5_piece_4, bisect_by=Plane(origin=(-218.722210076, -33.518401267, 87.363371848), z_dir=(1, 0, 0)), keep=Keep.TOP, mode=Mode.PRIVATE)
    add(cong_5_piece_4)


solid = enl_v_mat_extru_4_kept_piece.part
